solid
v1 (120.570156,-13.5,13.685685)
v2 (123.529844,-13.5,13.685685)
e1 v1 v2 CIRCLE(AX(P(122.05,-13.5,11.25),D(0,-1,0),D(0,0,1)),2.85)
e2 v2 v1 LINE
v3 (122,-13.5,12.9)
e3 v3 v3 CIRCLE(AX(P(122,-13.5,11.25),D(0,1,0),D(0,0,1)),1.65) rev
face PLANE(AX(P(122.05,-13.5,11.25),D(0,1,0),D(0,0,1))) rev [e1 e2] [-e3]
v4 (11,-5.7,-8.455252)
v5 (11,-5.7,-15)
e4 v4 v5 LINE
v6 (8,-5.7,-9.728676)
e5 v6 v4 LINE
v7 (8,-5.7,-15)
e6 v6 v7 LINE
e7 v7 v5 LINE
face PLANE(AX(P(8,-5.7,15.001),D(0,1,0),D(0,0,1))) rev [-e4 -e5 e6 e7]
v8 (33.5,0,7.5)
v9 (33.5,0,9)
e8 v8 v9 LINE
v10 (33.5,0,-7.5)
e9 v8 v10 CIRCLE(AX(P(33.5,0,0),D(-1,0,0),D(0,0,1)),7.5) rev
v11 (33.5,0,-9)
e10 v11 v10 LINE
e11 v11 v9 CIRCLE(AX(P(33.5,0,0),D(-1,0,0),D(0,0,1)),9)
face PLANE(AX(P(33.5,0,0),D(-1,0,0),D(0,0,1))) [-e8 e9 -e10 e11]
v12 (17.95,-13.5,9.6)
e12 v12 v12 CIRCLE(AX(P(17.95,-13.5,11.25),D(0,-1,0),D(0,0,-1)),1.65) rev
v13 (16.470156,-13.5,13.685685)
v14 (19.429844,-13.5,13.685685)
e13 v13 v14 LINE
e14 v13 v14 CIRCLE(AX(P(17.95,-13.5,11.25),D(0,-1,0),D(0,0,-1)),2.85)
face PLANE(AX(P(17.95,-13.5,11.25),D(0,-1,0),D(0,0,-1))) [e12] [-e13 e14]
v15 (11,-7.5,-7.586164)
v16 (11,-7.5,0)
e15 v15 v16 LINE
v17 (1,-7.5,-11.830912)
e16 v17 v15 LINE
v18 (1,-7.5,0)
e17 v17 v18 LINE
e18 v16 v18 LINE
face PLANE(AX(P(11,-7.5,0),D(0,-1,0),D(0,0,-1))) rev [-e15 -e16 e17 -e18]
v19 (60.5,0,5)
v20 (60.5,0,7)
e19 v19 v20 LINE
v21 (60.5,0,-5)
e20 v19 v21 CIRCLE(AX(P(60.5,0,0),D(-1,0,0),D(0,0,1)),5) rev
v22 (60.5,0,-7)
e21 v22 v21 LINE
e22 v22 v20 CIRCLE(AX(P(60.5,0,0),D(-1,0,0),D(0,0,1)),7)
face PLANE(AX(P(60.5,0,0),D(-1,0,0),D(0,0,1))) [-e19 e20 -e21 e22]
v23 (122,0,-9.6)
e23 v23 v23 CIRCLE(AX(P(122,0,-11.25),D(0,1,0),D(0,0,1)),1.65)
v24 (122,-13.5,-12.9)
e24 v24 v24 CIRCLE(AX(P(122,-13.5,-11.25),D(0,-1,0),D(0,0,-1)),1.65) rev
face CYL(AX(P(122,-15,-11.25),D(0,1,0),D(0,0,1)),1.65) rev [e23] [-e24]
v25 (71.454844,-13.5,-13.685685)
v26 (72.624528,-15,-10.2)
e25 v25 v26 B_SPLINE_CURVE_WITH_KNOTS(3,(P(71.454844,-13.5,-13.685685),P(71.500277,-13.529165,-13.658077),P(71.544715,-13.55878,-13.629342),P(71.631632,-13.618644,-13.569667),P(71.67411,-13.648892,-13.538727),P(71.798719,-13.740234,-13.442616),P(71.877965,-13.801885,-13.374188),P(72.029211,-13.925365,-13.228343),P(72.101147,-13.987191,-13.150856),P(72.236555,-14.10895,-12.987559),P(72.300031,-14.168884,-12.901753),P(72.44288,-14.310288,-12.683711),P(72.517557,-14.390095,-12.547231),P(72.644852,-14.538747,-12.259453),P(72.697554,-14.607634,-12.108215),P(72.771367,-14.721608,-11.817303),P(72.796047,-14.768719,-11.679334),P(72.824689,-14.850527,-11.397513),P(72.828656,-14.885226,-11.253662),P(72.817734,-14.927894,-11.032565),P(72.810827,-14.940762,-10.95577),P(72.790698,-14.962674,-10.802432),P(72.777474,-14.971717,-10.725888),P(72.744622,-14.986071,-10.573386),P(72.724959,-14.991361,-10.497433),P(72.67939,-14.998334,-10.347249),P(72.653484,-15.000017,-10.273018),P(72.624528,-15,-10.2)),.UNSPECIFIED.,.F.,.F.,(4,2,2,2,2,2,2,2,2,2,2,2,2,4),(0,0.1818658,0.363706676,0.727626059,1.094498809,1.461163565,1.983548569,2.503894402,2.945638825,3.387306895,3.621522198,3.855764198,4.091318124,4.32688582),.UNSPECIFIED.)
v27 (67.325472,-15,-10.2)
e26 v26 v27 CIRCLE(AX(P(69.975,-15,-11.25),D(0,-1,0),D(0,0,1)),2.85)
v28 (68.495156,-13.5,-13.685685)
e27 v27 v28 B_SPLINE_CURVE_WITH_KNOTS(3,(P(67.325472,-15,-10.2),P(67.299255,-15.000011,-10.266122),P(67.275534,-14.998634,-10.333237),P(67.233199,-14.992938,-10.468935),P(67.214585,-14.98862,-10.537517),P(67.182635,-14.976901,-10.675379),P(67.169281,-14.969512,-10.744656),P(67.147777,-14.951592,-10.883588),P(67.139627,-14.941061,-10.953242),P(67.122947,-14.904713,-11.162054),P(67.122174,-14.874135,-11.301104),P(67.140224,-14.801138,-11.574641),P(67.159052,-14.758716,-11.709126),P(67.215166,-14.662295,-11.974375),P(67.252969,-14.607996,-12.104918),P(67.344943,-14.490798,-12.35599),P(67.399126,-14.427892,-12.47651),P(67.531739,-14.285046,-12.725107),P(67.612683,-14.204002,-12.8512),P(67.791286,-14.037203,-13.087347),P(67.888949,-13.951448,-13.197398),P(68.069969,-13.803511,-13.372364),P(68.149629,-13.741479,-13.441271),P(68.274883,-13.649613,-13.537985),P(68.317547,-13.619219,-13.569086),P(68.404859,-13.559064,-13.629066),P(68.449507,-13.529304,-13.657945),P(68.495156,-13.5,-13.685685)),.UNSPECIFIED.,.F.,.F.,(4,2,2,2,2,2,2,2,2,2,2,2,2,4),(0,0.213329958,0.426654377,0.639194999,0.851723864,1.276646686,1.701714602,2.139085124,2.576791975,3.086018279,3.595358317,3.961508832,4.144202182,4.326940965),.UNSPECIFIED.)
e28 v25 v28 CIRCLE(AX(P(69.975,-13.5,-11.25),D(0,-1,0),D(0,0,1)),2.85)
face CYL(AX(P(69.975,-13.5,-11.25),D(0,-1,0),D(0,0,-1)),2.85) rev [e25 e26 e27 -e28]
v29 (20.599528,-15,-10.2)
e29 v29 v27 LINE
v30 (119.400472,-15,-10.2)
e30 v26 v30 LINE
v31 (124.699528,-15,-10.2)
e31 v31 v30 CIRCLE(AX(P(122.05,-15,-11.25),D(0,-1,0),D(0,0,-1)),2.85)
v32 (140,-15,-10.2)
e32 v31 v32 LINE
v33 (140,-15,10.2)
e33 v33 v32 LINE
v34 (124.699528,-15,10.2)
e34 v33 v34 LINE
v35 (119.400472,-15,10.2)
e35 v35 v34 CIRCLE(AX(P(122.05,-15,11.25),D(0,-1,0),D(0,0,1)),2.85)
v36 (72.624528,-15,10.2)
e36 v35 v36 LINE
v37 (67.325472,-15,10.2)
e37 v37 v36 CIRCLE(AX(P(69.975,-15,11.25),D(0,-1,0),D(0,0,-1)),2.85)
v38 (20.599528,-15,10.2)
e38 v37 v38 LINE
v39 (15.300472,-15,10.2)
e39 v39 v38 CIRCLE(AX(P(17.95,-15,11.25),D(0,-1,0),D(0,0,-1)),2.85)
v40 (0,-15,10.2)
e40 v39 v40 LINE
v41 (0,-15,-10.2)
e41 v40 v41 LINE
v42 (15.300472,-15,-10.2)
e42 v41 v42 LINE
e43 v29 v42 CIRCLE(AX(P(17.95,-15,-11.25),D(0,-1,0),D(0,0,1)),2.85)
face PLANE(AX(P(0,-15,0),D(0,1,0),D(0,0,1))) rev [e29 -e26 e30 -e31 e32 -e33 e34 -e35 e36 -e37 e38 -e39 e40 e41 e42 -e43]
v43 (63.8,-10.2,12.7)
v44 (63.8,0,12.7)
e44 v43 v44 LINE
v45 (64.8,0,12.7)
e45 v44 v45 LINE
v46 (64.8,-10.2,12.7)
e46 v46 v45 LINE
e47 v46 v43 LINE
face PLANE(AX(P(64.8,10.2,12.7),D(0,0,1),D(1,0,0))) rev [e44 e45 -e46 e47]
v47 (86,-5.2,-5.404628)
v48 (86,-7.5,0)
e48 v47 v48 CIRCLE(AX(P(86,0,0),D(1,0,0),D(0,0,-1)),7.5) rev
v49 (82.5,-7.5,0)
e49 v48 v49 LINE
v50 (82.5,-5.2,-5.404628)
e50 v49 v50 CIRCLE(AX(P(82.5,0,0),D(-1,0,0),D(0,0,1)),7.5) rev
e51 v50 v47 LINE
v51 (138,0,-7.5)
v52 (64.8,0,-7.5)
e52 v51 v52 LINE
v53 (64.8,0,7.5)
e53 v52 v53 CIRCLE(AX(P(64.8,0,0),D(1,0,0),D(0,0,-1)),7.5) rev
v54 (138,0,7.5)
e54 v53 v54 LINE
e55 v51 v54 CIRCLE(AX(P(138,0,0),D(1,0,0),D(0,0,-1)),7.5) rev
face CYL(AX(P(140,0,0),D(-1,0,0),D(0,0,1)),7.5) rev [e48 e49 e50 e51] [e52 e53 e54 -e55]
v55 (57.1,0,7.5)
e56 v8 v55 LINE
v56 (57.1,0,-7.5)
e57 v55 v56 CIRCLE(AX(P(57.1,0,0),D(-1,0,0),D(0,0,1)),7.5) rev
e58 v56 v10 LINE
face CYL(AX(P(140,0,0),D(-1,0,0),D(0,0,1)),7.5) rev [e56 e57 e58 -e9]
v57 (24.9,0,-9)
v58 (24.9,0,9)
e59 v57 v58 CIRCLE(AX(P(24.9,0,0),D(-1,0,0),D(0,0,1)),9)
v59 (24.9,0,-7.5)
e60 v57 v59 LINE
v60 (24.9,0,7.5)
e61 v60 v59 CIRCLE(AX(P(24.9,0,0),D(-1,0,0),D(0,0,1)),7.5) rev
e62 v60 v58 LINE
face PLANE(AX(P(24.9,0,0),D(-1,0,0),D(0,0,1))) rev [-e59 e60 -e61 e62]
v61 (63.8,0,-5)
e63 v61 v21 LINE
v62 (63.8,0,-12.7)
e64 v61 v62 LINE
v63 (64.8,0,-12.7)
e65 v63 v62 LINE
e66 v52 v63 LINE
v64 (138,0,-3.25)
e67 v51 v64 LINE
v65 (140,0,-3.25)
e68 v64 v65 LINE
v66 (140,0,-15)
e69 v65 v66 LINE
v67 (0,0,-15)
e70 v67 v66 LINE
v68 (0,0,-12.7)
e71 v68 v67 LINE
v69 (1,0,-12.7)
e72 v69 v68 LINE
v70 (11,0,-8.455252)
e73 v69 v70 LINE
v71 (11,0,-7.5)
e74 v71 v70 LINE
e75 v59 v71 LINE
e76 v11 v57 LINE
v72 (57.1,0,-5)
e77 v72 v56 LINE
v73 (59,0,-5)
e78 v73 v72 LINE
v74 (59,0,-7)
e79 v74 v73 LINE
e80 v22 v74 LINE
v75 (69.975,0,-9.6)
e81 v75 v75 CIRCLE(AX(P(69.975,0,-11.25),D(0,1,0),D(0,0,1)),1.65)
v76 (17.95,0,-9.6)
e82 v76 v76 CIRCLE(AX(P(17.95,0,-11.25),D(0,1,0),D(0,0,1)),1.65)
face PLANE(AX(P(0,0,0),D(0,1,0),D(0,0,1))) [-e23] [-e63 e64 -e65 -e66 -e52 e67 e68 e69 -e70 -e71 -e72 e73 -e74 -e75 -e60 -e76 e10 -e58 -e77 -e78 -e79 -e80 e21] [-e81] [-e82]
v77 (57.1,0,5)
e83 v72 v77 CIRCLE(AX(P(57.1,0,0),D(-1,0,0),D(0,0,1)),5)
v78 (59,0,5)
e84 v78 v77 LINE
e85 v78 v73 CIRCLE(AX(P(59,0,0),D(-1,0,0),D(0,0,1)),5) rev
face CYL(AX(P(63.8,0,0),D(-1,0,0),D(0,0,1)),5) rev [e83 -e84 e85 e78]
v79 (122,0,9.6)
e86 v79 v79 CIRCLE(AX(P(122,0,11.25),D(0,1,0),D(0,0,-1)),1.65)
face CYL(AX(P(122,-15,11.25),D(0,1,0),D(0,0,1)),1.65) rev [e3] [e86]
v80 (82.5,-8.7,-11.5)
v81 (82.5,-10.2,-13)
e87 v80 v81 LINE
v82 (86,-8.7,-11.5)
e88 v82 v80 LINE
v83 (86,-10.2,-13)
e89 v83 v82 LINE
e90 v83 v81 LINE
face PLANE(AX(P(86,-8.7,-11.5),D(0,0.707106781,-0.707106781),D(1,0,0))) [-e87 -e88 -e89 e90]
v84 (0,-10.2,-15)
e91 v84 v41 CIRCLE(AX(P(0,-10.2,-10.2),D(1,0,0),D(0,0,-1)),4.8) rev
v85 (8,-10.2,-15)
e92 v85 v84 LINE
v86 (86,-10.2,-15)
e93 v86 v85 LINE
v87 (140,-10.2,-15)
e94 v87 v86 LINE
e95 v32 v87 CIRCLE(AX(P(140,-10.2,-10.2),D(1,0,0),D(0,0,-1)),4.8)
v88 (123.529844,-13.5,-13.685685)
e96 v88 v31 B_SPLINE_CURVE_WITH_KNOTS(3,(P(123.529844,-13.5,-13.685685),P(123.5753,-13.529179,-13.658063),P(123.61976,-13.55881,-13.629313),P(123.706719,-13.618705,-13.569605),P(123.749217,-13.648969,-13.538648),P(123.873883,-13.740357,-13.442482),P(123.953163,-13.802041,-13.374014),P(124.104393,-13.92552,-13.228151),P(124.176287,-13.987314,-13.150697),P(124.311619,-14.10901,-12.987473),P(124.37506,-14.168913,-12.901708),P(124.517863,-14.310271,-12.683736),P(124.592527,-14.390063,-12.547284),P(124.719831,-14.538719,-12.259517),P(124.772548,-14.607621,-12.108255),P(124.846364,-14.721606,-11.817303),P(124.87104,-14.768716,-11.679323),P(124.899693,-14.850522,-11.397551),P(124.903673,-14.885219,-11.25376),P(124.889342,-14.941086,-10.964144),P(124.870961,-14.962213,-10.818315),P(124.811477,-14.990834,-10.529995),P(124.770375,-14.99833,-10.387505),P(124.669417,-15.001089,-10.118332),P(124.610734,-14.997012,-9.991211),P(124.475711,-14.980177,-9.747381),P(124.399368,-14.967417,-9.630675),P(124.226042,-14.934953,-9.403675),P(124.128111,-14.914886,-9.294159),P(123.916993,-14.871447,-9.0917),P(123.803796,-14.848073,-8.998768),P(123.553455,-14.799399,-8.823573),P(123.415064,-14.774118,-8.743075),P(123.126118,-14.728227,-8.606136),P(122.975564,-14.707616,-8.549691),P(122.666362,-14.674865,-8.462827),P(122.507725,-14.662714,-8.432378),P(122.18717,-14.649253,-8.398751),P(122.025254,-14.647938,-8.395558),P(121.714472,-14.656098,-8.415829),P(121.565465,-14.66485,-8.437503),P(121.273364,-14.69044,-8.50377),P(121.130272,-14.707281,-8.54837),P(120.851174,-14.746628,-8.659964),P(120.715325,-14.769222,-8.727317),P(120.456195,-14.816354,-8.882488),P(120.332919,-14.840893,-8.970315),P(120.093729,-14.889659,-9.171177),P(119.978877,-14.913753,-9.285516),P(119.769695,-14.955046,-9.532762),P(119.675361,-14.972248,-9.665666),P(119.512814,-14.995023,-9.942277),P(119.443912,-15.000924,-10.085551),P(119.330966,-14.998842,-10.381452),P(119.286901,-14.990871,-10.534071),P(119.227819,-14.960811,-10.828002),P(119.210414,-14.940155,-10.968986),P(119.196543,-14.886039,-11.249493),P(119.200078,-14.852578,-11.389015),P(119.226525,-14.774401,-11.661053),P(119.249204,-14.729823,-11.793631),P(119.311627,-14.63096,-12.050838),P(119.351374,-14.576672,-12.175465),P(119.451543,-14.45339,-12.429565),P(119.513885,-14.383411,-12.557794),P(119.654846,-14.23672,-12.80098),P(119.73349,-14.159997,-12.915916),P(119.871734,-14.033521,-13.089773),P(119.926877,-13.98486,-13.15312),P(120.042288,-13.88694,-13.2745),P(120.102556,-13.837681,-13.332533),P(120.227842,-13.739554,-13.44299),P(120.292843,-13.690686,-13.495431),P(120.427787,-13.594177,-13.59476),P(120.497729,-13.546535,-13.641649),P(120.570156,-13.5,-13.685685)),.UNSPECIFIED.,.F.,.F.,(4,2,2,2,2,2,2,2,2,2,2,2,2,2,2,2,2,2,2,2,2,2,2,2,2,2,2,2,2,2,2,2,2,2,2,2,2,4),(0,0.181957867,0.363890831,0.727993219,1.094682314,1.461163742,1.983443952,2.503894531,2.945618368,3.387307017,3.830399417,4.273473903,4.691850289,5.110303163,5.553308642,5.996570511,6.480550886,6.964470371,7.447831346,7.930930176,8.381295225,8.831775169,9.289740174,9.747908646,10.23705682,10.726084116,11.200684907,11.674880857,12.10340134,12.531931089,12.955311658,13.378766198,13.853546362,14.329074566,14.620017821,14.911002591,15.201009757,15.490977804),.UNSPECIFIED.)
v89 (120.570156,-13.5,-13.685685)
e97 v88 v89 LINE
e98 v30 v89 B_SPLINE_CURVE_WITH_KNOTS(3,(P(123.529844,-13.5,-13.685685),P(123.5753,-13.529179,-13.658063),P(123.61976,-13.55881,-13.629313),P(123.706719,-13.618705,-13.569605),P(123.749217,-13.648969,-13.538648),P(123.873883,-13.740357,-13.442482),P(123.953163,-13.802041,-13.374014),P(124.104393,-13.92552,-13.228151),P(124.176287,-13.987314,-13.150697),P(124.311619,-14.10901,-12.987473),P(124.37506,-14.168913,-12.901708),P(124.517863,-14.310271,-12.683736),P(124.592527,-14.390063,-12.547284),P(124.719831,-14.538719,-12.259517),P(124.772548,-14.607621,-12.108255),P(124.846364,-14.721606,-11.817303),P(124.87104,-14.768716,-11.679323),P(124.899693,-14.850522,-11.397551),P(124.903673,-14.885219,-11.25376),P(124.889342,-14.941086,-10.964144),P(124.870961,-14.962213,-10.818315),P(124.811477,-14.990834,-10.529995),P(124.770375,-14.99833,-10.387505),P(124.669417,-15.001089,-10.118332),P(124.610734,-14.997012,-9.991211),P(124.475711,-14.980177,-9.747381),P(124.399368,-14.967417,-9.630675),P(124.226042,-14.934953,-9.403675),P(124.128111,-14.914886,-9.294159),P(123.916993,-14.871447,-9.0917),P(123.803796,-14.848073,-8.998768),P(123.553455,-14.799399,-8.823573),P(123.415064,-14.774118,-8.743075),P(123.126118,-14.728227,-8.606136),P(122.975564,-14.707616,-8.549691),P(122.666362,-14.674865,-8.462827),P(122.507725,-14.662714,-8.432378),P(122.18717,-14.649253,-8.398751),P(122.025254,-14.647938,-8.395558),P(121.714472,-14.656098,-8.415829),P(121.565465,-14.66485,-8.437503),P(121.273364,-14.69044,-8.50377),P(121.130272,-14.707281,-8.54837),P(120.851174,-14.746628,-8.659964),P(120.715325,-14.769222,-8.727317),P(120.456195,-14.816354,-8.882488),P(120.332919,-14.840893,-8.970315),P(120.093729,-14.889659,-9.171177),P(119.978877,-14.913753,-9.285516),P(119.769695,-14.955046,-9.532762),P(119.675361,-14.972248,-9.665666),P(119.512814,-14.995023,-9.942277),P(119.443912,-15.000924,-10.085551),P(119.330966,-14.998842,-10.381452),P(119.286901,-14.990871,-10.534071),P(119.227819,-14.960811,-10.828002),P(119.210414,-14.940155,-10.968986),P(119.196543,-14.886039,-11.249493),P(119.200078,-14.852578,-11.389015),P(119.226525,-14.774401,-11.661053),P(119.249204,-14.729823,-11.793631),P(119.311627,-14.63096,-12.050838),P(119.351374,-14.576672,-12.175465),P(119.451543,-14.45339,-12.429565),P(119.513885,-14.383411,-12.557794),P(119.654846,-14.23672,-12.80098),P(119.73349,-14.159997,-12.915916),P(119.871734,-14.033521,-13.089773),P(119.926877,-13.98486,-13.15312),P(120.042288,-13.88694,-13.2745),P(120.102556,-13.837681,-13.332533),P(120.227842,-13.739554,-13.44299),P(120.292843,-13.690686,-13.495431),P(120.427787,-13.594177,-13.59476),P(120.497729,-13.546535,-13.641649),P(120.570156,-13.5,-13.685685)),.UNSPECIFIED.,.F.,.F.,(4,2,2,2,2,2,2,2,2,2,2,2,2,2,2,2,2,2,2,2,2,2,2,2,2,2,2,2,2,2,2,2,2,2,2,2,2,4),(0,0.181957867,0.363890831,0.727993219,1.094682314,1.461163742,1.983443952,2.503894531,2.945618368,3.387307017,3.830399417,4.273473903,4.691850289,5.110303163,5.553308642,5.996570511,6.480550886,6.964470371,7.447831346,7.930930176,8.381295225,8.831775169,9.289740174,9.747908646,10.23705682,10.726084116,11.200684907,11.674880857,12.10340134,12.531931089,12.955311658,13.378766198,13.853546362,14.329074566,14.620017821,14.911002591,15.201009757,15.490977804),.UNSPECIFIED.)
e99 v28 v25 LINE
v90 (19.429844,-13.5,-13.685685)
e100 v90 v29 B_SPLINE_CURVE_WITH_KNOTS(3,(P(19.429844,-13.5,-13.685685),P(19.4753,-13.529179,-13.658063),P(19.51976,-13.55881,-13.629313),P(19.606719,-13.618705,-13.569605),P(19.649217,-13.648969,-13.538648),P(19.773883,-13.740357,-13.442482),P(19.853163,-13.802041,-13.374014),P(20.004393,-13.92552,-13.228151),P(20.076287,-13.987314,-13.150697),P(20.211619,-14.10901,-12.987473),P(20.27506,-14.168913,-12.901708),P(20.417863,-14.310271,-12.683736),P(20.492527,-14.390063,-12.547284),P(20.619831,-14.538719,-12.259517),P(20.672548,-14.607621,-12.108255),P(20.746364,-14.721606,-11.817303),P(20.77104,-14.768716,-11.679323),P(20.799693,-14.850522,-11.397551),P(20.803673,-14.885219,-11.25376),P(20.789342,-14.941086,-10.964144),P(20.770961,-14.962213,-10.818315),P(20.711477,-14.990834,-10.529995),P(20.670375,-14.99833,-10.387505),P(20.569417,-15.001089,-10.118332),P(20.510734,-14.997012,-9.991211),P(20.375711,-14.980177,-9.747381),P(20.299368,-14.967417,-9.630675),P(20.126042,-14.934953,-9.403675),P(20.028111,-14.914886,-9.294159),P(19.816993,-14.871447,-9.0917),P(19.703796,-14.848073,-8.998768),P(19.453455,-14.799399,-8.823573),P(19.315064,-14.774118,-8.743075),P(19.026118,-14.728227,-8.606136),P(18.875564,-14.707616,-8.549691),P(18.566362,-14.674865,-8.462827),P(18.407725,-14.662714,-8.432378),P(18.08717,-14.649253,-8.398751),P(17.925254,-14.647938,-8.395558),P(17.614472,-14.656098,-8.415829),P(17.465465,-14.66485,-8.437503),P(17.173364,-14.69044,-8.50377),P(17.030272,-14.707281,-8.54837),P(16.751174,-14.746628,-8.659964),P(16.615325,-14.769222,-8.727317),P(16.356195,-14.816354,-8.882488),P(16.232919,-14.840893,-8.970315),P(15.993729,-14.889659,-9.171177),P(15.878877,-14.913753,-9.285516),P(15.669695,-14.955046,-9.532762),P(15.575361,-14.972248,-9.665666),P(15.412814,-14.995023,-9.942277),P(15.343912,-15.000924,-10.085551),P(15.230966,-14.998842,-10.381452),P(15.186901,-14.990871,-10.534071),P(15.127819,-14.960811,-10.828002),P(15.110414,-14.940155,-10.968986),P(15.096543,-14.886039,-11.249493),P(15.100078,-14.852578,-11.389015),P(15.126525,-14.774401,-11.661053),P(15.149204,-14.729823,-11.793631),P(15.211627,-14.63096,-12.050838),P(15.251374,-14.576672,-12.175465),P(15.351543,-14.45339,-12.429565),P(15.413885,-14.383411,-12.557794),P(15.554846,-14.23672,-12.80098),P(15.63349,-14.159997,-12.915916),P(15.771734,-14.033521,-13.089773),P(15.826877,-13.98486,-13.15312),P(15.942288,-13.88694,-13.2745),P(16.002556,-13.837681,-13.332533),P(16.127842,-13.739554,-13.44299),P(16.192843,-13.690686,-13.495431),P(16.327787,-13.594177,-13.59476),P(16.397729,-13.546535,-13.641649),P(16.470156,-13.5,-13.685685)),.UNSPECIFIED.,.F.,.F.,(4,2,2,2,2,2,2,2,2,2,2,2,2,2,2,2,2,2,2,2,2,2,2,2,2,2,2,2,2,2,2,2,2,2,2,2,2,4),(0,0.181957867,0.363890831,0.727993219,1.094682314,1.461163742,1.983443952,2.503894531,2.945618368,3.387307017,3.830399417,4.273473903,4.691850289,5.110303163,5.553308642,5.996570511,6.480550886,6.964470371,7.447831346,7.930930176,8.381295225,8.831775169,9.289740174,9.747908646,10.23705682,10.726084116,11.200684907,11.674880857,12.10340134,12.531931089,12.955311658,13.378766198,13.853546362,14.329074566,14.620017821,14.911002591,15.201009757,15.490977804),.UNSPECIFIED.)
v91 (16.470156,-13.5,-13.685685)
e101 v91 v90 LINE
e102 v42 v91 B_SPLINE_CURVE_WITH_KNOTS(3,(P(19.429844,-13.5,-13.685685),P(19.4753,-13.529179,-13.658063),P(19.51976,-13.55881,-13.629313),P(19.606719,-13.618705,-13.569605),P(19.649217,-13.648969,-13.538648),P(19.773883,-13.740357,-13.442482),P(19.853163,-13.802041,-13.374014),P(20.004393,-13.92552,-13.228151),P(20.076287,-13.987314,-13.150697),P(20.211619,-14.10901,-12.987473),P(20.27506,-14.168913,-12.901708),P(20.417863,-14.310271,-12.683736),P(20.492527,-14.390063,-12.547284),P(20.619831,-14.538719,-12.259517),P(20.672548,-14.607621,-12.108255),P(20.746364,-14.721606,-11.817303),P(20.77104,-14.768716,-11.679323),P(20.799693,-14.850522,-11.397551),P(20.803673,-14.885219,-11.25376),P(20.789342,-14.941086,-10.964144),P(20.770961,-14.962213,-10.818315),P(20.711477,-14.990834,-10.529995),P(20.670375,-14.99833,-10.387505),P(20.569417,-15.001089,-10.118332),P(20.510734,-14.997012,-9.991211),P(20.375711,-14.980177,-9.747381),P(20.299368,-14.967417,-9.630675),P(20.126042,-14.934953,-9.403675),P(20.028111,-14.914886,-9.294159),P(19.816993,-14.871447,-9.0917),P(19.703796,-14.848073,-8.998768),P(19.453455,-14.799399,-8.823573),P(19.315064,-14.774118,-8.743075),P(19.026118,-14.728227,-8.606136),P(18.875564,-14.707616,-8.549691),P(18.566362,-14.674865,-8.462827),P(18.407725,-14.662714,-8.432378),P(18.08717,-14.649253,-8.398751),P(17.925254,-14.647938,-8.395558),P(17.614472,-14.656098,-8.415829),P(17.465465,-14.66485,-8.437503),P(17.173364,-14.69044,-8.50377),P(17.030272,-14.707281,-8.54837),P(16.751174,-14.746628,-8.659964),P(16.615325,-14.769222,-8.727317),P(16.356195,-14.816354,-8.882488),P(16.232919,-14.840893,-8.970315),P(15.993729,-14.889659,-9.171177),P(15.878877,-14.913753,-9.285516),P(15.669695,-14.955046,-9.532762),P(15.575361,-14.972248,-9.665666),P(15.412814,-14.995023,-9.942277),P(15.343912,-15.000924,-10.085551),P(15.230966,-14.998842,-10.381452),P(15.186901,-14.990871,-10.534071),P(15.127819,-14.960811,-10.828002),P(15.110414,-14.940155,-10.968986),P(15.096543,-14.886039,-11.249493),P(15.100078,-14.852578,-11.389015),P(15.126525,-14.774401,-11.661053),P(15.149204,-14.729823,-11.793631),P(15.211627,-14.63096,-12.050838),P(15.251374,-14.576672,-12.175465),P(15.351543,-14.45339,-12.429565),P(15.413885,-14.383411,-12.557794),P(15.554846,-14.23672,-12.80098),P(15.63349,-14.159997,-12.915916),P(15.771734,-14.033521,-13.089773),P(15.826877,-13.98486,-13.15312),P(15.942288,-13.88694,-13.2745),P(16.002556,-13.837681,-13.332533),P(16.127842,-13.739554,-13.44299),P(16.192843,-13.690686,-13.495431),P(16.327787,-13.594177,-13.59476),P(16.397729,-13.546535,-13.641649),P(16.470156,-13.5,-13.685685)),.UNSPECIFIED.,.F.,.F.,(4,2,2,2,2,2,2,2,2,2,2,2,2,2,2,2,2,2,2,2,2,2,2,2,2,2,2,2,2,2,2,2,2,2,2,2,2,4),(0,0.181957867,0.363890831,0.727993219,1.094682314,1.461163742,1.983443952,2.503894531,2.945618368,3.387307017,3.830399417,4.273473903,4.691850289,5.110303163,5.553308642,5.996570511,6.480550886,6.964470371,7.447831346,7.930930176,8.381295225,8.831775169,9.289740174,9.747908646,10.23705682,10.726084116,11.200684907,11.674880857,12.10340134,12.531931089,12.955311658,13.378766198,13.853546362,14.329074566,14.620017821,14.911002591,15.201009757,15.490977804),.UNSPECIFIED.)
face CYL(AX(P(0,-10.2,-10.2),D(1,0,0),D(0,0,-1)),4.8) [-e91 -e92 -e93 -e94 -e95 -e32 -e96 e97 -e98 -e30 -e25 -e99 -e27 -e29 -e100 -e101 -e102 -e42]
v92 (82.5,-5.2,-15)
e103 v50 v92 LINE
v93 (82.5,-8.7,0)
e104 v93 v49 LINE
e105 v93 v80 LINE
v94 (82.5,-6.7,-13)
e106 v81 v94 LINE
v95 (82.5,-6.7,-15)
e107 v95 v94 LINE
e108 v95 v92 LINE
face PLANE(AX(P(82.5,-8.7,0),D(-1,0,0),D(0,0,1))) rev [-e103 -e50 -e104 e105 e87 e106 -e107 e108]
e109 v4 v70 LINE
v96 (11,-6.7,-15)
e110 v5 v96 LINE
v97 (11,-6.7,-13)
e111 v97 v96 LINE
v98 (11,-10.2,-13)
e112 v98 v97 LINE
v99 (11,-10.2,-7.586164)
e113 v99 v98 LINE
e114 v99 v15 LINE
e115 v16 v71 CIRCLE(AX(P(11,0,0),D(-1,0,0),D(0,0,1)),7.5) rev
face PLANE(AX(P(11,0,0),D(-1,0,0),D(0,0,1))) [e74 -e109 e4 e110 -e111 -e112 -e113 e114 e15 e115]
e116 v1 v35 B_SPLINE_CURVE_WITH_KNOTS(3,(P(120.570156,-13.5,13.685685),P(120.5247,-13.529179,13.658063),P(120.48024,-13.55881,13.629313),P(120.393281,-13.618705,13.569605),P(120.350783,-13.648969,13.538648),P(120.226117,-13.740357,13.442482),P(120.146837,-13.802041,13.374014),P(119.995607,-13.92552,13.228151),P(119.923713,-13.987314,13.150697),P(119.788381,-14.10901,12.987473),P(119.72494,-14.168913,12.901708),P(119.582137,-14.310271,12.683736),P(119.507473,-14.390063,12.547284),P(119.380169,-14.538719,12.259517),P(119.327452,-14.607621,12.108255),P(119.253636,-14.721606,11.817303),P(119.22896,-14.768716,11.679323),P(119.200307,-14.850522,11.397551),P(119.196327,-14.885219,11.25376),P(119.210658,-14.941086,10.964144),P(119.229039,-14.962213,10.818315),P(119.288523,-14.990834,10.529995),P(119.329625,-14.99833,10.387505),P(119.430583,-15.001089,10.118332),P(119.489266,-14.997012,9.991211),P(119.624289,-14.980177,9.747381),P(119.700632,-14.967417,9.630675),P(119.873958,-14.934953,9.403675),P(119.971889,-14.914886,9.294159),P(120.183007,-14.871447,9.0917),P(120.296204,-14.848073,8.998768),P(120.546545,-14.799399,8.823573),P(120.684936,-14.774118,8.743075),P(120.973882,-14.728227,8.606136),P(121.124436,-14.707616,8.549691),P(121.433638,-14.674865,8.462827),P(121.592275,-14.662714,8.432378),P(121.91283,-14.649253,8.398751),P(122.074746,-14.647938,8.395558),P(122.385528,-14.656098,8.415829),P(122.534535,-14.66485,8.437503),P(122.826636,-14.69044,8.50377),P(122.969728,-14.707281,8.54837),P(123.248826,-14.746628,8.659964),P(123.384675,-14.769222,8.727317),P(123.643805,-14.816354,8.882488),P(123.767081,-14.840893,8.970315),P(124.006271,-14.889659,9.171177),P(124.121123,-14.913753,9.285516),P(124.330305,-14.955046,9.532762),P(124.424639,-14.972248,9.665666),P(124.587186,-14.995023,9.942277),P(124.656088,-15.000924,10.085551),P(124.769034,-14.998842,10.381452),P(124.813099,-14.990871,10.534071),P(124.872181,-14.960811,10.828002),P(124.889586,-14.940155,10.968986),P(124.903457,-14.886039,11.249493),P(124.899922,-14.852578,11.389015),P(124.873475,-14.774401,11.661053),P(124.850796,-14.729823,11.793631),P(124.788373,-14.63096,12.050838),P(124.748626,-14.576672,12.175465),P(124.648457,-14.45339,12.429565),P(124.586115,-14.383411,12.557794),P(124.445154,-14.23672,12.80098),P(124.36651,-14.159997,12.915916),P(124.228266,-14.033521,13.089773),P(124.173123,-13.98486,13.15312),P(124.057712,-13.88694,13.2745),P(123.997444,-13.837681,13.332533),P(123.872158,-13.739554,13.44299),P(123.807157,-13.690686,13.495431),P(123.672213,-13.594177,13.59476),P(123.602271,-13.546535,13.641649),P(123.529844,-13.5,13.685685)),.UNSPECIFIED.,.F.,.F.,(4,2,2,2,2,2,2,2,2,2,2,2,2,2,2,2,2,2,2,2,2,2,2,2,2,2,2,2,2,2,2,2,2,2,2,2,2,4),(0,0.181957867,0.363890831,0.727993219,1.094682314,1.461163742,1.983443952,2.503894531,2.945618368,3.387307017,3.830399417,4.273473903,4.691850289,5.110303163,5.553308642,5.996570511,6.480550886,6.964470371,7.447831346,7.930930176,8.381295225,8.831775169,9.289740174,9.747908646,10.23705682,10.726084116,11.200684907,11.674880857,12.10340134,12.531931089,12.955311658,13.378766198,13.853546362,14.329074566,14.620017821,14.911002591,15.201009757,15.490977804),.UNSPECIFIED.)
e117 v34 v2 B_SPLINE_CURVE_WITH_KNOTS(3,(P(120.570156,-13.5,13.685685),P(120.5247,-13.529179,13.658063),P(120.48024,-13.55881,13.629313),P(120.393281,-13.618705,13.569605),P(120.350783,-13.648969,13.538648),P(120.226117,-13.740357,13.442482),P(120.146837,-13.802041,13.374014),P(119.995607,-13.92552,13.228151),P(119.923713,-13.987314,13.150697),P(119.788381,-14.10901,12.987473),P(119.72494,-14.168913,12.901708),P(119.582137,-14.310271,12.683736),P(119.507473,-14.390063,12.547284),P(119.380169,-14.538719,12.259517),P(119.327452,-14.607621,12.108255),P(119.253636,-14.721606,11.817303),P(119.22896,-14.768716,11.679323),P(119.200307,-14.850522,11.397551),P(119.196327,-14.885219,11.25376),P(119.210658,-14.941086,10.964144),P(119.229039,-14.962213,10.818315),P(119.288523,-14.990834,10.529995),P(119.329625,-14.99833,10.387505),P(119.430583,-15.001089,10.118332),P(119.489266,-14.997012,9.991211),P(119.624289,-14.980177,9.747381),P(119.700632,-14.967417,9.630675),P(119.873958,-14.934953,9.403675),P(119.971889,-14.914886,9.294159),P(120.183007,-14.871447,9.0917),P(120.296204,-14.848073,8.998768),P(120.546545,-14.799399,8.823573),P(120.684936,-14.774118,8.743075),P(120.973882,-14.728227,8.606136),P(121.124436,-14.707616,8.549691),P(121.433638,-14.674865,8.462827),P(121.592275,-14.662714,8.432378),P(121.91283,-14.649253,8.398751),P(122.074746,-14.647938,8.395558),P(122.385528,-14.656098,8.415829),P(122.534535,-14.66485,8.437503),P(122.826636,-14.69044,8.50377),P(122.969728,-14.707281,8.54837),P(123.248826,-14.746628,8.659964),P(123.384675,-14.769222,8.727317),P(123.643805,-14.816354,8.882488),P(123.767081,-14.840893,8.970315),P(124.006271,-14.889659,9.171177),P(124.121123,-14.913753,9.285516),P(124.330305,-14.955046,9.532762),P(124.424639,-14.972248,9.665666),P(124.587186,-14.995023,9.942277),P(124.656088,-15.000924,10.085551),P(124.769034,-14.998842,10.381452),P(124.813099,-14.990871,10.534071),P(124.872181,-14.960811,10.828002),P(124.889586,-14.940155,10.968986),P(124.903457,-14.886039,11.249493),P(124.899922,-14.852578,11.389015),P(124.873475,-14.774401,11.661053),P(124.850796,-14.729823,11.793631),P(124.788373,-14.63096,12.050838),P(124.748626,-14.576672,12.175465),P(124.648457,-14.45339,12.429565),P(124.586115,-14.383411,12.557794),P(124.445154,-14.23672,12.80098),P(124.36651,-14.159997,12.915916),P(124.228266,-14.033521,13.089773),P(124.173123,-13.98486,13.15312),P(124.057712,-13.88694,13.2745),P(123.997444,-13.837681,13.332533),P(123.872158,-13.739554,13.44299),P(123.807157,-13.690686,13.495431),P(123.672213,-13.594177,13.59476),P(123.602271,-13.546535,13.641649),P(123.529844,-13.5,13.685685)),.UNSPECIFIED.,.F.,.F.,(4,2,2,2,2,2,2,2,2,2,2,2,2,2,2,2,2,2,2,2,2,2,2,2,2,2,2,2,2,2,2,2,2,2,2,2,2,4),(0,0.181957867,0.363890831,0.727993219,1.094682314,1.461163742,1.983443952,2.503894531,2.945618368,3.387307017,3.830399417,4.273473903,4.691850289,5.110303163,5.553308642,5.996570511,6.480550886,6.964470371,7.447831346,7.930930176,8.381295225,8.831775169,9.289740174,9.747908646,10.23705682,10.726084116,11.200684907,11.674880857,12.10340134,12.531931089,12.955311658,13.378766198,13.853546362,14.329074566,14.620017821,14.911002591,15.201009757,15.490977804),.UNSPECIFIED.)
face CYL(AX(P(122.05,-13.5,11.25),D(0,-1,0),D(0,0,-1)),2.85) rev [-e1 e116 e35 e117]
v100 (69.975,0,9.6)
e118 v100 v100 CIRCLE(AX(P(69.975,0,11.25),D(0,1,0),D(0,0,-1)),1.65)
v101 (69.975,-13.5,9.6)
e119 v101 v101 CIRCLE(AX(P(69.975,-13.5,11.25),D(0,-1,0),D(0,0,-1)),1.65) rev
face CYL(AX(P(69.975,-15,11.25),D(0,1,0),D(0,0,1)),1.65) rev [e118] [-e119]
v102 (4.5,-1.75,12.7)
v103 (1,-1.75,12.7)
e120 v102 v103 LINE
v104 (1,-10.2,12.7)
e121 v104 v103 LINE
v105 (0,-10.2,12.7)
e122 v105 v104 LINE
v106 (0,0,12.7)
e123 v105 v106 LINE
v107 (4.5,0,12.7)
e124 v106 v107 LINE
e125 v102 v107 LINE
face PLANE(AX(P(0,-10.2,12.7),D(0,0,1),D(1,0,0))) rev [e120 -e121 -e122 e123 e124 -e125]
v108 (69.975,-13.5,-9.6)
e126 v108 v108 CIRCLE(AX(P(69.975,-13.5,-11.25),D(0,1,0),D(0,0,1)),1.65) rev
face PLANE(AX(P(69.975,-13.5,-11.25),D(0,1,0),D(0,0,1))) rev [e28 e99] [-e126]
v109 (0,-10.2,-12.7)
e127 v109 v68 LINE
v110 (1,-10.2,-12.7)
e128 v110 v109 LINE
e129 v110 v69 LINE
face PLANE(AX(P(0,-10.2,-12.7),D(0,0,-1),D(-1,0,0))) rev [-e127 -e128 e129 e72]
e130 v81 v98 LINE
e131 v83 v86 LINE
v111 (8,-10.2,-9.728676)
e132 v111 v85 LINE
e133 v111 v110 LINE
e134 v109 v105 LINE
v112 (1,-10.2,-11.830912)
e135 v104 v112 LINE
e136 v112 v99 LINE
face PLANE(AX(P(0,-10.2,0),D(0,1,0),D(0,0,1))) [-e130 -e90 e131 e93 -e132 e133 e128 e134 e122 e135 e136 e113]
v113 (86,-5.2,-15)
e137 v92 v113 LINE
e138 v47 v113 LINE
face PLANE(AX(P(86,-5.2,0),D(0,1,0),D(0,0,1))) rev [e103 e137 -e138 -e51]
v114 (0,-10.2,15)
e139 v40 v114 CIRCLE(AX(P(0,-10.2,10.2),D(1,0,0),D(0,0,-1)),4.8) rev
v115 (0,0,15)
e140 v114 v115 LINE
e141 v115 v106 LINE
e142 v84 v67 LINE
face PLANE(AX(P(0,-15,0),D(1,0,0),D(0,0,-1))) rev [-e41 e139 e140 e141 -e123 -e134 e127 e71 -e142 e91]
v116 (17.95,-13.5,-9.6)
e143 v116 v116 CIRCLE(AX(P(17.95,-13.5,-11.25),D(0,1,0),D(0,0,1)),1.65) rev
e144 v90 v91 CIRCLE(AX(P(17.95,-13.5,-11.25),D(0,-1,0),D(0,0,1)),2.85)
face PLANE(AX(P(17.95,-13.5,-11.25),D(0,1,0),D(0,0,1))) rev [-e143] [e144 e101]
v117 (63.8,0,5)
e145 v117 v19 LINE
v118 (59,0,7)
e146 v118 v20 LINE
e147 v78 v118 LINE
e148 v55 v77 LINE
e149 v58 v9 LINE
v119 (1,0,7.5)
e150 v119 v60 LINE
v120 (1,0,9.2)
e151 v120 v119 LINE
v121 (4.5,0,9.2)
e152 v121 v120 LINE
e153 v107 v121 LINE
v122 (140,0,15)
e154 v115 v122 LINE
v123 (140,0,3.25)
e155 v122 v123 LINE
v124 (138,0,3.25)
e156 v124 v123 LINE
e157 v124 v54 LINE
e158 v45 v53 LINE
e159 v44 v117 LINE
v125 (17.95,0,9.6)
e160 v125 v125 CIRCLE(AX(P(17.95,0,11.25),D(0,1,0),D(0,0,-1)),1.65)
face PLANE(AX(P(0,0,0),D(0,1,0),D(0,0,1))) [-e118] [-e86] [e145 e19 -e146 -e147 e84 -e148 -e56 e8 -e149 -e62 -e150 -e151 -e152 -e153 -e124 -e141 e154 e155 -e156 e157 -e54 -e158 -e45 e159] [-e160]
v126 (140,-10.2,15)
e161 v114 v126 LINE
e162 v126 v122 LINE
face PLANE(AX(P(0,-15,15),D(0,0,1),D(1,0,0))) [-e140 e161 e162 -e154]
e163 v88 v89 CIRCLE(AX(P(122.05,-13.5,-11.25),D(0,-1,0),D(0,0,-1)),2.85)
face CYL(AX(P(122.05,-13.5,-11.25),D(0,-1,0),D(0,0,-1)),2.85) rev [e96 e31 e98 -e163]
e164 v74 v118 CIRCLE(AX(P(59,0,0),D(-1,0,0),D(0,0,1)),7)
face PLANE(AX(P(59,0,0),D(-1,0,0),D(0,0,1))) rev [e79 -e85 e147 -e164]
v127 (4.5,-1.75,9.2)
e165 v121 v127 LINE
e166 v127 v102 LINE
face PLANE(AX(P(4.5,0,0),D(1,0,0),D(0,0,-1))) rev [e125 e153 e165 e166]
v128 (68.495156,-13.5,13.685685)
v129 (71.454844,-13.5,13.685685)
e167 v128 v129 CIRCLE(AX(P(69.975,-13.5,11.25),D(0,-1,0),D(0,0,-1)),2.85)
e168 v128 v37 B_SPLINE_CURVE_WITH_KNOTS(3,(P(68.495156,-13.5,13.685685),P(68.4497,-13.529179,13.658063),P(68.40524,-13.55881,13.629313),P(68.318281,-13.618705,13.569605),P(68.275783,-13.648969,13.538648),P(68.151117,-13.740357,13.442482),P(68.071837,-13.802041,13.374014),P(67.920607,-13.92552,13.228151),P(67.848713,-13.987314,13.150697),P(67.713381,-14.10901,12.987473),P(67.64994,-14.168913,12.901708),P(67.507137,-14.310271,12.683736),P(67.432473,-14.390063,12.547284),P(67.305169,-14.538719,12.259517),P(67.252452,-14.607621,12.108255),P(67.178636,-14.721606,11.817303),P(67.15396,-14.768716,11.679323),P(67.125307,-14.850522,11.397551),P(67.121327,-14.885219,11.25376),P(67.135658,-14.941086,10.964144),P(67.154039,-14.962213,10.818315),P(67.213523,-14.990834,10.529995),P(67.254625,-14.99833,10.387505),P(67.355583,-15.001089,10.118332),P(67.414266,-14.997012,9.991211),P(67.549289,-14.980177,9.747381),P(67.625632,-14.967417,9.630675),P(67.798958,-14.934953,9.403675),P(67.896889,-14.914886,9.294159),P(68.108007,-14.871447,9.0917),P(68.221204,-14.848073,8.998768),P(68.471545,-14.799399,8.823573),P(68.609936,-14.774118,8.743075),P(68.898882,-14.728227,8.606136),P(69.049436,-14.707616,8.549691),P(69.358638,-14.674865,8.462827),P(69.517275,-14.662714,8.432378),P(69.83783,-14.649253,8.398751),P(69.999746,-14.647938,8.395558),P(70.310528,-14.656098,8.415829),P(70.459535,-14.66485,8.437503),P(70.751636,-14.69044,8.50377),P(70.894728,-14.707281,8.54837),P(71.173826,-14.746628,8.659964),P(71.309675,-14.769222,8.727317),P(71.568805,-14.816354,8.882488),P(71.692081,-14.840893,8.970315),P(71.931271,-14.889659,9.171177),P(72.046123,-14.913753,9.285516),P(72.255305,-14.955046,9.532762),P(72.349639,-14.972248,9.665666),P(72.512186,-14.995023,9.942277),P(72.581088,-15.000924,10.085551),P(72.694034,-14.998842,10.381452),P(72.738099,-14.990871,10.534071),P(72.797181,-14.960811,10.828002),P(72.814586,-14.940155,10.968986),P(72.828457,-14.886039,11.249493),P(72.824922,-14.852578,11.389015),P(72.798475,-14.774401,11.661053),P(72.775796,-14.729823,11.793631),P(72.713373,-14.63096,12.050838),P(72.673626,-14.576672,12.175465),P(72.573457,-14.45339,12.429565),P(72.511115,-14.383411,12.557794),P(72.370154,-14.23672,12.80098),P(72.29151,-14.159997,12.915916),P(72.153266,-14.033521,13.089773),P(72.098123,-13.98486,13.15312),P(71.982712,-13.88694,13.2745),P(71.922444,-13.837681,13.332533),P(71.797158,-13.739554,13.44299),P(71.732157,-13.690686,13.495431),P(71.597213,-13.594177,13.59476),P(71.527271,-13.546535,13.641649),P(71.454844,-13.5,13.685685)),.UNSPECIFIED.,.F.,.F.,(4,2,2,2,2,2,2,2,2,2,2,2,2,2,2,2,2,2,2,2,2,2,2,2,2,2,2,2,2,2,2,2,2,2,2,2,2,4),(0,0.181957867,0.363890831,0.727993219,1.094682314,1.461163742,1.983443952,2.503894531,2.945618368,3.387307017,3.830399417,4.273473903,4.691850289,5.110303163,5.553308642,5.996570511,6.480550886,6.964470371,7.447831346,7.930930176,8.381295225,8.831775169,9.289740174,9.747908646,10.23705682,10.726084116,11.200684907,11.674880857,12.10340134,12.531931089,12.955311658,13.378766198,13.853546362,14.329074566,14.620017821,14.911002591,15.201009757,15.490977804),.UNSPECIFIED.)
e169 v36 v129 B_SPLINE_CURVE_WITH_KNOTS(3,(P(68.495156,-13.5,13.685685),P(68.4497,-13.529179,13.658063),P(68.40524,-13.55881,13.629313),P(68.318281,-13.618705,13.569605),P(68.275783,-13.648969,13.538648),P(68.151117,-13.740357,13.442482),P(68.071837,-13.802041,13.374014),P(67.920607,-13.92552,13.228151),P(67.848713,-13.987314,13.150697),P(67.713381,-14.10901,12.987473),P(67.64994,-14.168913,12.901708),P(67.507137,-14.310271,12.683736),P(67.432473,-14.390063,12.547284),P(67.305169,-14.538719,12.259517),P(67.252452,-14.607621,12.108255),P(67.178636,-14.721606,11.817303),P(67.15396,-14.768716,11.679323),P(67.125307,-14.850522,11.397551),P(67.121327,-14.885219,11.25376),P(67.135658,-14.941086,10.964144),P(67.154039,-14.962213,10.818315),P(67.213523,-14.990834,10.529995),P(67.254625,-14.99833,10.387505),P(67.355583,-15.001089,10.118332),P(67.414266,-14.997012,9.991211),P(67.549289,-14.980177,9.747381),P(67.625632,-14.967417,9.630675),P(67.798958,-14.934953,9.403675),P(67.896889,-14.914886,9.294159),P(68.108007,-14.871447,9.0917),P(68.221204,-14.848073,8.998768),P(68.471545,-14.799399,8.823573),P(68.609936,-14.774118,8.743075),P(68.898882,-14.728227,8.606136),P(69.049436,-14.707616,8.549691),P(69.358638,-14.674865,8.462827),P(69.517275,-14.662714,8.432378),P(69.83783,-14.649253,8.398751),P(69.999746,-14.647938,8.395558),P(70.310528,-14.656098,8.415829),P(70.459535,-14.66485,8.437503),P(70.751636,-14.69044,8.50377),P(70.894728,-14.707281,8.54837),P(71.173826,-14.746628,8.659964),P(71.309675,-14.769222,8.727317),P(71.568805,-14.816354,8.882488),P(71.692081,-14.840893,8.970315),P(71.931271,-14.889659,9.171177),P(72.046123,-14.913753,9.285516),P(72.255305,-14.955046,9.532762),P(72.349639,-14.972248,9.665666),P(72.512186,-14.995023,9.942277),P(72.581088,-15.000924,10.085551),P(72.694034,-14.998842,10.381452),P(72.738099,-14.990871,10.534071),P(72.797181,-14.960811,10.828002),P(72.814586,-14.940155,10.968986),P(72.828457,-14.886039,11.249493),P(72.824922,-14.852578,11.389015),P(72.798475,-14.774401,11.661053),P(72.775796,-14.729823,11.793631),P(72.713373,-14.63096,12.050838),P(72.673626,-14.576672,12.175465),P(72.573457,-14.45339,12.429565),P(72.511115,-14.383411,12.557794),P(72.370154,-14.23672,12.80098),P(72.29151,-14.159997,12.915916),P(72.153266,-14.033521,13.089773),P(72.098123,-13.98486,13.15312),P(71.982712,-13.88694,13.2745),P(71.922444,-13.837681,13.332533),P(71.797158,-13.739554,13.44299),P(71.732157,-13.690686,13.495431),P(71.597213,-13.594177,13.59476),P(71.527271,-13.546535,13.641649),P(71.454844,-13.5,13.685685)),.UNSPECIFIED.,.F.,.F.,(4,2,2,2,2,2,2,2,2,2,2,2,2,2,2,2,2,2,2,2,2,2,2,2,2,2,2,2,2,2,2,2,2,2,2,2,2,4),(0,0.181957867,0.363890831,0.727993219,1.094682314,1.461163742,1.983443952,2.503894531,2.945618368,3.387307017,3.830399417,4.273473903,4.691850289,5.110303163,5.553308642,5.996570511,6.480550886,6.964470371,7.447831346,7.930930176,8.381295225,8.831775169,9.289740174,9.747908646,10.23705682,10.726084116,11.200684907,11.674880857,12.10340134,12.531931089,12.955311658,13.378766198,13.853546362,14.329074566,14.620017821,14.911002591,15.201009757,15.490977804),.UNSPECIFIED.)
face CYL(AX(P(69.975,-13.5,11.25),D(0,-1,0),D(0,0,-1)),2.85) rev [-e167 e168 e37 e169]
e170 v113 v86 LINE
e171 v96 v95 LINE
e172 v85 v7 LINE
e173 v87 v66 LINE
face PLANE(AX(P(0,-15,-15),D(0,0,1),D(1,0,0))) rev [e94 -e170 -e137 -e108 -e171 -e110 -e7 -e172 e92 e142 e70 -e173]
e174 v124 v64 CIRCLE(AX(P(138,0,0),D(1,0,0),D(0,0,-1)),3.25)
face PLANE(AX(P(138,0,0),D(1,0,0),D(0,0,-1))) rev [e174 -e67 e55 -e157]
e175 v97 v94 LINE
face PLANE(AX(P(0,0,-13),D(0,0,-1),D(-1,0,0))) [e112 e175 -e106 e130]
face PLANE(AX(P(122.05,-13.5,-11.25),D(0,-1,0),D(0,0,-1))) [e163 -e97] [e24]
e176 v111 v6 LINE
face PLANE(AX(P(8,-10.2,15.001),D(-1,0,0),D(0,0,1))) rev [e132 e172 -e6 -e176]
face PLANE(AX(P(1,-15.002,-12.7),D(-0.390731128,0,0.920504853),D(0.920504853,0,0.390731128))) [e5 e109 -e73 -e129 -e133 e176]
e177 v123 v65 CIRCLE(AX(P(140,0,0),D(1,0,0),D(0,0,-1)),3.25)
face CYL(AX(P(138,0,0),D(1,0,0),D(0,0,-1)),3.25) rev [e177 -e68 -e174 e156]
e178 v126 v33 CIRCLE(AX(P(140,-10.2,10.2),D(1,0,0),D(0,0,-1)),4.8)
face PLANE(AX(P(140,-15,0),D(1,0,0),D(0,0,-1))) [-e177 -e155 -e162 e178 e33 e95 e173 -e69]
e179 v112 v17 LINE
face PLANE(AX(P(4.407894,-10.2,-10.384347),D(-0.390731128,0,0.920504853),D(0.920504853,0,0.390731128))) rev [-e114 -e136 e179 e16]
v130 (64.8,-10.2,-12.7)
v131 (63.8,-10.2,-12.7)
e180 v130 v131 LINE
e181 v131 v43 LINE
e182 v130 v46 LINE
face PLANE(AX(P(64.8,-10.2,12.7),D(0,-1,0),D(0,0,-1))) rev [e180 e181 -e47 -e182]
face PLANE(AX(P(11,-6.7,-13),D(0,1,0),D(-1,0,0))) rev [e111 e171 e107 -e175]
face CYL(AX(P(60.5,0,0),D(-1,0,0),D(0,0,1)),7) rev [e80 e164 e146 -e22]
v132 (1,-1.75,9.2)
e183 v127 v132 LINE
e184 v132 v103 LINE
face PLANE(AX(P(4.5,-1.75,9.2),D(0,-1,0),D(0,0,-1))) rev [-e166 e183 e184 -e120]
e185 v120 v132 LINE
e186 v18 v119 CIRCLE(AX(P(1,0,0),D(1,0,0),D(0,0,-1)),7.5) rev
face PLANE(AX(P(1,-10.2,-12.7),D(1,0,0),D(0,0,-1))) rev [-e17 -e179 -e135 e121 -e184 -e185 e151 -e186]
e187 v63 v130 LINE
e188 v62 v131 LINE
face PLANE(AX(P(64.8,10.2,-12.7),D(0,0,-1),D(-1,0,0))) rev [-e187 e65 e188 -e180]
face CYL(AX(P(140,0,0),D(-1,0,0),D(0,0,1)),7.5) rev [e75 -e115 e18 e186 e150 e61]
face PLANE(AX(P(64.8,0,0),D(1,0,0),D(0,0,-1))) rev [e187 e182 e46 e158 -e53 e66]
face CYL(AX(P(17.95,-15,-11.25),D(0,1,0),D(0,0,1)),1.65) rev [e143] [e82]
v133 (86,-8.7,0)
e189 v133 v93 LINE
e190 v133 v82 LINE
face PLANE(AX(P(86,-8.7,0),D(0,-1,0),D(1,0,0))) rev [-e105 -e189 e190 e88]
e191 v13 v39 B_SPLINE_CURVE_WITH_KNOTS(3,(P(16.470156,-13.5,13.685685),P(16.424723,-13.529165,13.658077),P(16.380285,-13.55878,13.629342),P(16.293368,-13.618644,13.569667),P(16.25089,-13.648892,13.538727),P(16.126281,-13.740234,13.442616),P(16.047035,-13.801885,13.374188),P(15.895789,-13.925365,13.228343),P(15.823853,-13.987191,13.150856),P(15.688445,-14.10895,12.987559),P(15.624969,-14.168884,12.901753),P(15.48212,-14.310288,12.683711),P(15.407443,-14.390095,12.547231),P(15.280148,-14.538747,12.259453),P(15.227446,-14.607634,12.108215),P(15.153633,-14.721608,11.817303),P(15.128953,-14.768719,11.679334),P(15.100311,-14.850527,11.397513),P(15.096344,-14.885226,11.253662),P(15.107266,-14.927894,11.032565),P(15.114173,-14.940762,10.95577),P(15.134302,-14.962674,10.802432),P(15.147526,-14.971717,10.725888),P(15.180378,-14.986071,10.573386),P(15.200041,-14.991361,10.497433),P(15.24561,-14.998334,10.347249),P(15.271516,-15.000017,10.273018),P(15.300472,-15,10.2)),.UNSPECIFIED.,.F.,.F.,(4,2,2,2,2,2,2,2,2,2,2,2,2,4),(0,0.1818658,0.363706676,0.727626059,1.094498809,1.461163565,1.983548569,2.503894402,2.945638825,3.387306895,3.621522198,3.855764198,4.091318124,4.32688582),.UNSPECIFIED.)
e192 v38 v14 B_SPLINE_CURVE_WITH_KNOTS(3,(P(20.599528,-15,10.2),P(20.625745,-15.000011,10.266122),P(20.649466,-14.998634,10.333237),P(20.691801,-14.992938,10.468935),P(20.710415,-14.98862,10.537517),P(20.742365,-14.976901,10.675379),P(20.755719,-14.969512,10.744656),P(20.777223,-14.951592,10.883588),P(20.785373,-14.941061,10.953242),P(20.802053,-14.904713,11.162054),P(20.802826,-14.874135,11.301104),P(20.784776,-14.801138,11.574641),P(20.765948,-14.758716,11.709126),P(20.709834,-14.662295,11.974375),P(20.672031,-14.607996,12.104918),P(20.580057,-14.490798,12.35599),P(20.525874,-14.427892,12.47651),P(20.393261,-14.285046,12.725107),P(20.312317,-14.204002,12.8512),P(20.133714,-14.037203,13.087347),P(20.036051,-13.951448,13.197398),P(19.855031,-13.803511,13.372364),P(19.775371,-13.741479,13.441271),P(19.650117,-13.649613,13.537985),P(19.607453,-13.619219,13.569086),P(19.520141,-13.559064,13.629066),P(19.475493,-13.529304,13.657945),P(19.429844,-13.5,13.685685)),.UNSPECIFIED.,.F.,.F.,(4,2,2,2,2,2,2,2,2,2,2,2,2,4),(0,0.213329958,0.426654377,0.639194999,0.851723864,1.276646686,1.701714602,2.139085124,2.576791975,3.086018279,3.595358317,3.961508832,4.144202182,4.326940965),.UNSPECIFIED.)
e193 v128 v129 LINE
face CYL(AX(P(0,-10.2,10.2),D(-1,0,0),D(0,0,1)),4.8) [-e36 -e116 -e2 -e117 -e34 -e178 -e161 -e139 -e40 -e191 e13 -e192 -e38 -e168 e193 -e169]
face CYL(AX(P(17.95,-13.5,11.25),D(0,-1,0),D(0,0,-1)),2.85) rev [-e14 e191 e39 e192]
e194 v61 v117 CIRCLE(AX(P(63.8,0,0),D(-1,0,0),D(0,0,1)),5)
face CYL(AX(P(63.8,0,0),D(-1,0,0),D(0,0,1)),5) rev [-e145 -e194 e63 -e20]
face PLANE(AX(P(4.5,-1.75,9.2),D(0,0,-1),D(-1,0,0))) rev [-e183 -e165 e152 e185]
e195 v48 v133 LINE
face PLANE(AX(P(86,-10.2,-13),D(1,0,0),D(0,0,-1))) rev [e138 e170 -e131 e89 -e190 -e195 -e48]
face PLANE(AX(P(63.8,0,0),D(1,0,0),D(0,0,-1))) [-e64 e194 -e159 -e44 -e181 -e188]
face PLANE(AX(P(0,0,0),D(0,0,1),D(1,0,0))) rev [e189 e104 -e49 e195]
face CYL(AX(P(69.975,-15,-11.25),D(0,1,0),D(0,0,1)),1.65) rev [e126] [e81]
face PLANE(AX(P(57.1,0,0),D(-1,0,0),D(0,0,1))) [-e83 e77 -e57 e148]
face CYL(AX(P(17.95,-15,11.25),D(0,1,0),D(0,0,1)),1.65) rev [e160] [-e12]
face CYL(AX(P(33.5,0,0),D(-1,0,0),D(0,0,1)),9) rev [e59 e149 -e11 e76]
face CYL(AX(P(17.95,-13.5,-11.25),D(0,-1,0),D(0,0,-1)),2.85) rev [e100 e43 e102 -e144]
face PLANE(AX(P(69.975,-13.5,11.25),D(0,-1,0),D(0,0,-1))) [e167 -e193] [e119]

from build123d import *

# Parameters (mm, degrees)
SKETCH2_W                 = 140
SKETCH2_H                 = 15
BASE_DEPTH                = 15
SKETCH3_R                 = 7.5
CENTER_CUT_DEPTH          = 142.598022585
SKETCH4_W                 = 1
SKETCH4_H                 = 25.4
ANTENNA_PCB_DEPTH         = 10.2
SKETCH14_W                = 3.5
SKETCH14_H                = 3.5
COAXIAL_CONNECTOR_DEPTH   = 3.5
LENS_START                = -23.9
SKETCH8_R                 = 9
LENS_DEPTH                = 8.6
PHOTODIODE_PCB_START      = -62.8
SKETCH10_W                = 25.4
SKETCH10_H                = 20.4
PHOTODIODE_PCB_DEPTH      = 1
FILLET1_R                 = 4.8
COAX_CONNECTOR_HOLE_START = -2
COAX_CONNECTOR_HOLE_DEPTH = 2
SKETCH16_W                = 12.7
SKETCH16_H                = 7.5
CUT_EXTRUDE2_DEPTH        = 10
BOSS_EXTRUDE1_REACH       = 143.598
CUT_EXTRUDE3_DEPTH        = 2.7
SKETCH19_R                = 1.65
CUT_EXTRUDE4_DEPTH        = 15
SKETCH20_R                = 2.85
CUT_EXTRUDE5_DEPTH        = 1.5
CUT_EXTRUDE6_REACH        = 145.962
SKETCH21_W                = 3
SKETCH21_H                = 4.5
SKETCH22_W                = 75
SKETCH22_H                = 3.5
CUT_EXTRUDE7_DEPTH        = 2
SKETCH24_W                = 3.5
SKETCH24_H                = 3.5
CUT_EXTRUDE8_DEPTH        = 15
CHAMFER2_SIZE             = 1.5
FILTER_MOUNT_START        = -56.1
FILTER_MOUNT_DEPTH        = 6.7
FILTER_SPACE_START        = -58
SKETCH9_R                 = 7
FILTER_SPACE_DEPTH        = 1.5


with BuildPart() as part:
    # Sketch2 → Base (new body)
    with BuildSketch(Plane(origin=(0, 0, 0), x_dir=(1, 0, 0), z_dir=(0, 1, 0))):
        with Locations((70, -7.5)):
            Rectangle(SKETCH2_W, SKETCH2_H)
        with Locations((70, 7.5)):
            Rectangle(SKETCH2_W, SKETCH2_H)
    extrude(amount=-BASE_DEPTH)

    # Sketch3 → Center_cut (cut, through all)
    with BuildSketch(Plane.ZY):
        Circle(SKETCH3_R)
    extrude(amount=-CENTER_CUT_DEPTH, mode=Mode.SUBTRACT)

    # Sketch4 → Antenna_PCB (cut)
    with BuildSketch(Plane(origin=(0, 0, 0), x_dir=(1, 0, 0), z_dir=(0, 1, 0))):
        with Locations((0.5, 0)):
            Rectangle(SKETCH4_W, SKETCH4_H)
    extrude(amount=-ANTENNA_PCB_DEPTH, mode=Mode.SUBTRACT)

    # Sketch14 → Coaxial_connector (cut)
    with BuildSketch(Plane.ZY.offset(-1)):
        with Locations((10.95, 0)):
            Rectangle(SKETCH14_W, SKETCH14_H)
    extrude(amount=-COAXIAL_CONNECTOR_DEPTH, mode=Mode.SUBTRACT)

    # Sketch8 → Lens (cut)
    with BuildSketch(Plane.ZY.offset(-1).offset(LENS_START)):
        Circle(SKETCH8_R)
    extrude(amount=-LENS_DEPTH, mode=Mode.SUBTRACT)

    # Sketch10 → Photodiode_PCB (cut)
    with BuildSketch(Plane.ZY.offset(-1).offset(PHOTODIODE_PCB_START)):
        Rectangle(SKETCH10_W, SKETCH10_H)
    extrude(amount=-PHOTODIODE_PCB_DEPTH, mode=Mode.SUBTRACT)

    # Fillet1
    fillet1_edges = [part.edges().sort_by_distance(p)[0] for p in [
        (70, -15, -15),
        (70, -15, 15),
    ]]
    fillet(fillet1_edges, radius=FILLET1_R)

    # Sketch15 → Coax_connector_hole (add)
    with BuildSketch(Plane(origin=(140, 0, 0), x_dir=(0, 0, -1), z_dir=(1, 0, 0)).offset(COAX_CONNECTOR_HOLE_START)):
        with BuildLine():
            ThreePointArc((-7.5, 0), (0, -7.5), (7.5, 0))
            Line((7.5, 0), (3.25, 0))
            ThreePointArc((3.25, 0), (0, -3.25), (-3.25, 0))
            Line((-3.25, 0), (-7.5, 0))
        make_face()
        with BuildLine():
            Line((11.25, -8), (11.25, 0))
            Line((11.25, 0), (7.5, 0))
            ThreePointArc((7.5, 0), (0, -7.5), (-7.5, 0))
            Line((-7.5, 0), (-11.25, 0))
            Line((-11.25, 0), (-11.25, -8))
            Line((-11.25, -8), (11.25, -8))
        make_face()
    extrude(amount=COAX_CONNECTOR_HOLE_DEPTH)

    # Sketch16 → Cut-Extrude2 (cut)
    with BuildSketch(Plane.ZY.offset(-1)):
        with Locations((-6.35, -3.75)):
            Rectangle(SKETCH16_W, SKETCH16_H)
    extrude(amount=-CUT_EXTRUDE2_DEPTH, mode=Mode.SUBTRACT)

    # Sketch17 → Boss-Extrude1 (add, up to next)
    with BuildSketch(Plane(origin=(0, 0, 0), x_dir=(1, 0, 0), z_dir=(0, 1, 0)), mode=Mode.PRIVATE) as boss_extrude1_sk1:
        Polygon((1, 12.7), (11, 8.455251838), (11, 12.7), align=None)
    boss_extrude1_tool1 = extrude(boss_extrude1_sk1.sketch, amount=-BOSS_EXTRUDE1_REACH, mode=Mode.PRIVATE) - part.part
    add(boss_extrude1_tool1.solids().sort_by_distance((7.666667, 0, -11.285084))[0])

    # Sketch18 → Cut-Extrude3 (cut)
    with BuildSketch(Plane(origin=(0, -7.5, 0), x_dir=(1, 0, 0), z_dir=(0, 1, 0))):
        Polygon((11, 8.455251838), (1, 12.7), (1, 11.830911698), (11, 7.586163536), align=None)
    extrude(amount=-CUT_EXTRUDE3_DEPTH, mode=Mode.SUBTRACT)

    # Sketch19 → Cut-Extrude4 (cut)
    with BuildSketch(Plane(origin=(0, 0, 0), x_dir=(1, 0, 0), z_dir=(0, 1, 0))):
        with Locations(Location((17.95, 11.25, 0), (0, 0, 270))):
            Circle(SKETCH19_R)
        with Locations(Location((122, 11.25, 0), (0, 0, 270))):
            Circle(SKETCH19_R)
        with Locations(Location((122, -11.25, 0), (0, 0, 39.521196359))):
            Circle(SKETCH19_R)
        with Locations(Location((17.95, -11.25, 0), (0, 0, 140.478803641))):
            Circle(SKETCH19_R)
        with Locations(Location((69.975, 11.25, 0), (0, 0, 270))):
            Circle(SKETCH19_R)
        with Locations(Location((69.975, -11.25, 0), (0, 0, 39.521196359))):
            Circle(SKETCH19_R)
    extrude(amount=-CUT_EXTRUDE4_DEPTH, mode=Mode.SUBTRACT)

    # Sketch20 → Cut-Extrude5 (cut)
    with BuildSketch(Plane.XZ.offset(15)):
        with Locations((17.95, 11.25)):
            Circle(SKETCH20_R)
        with Locations((122.05, 11.25)):
            Circle(SKETCH20_R)
        with Locations((122.05, -11.25)):
            Circle(SKETCH20_R)
        with Locations((17.95, -11.25)):
            Circle(SKETCH20_R)
        with Locations((69.975, 11.25)):
            Circle(SKETCH20_R)
        with Locations((69.975, -11.25)):
            Circle(SKETCH20_R)
    extrude(amount=-CUT_EXTRUDE5_DEPTH, mode=Mode.SUBTRACT)

    # Cut-Extrude6: up to this plane
    cut_extrude6_end = Plane(origin=(1, -15.002, -12.7), z_dir=(-0.3907311284892679, 0, 0.9205048534524428))
    # Sketch21 → Cut-Extrude6 (cut, up to the surface)
    with BuildSketch(Plane(origin=(0, 0, -15), x_dir=(-1, 0, 0), z_dir=(0, 0, -1)), mode=Mode.PRIVATE) as cut_extrude6_sk1:
        with Locations((-9.5, -7.95)):
            Rectangle(SKETCH21_W, SKETCH21_H)
    cut_extrude6_tool1 = split(extrude(cut_extrude6_sk1.sketch, amount=-CUT_EXTRUDE6_REACH, mode=Mode.PRIVATE), bisect_by=cut_extrude6_end, keep=Keep.BOTH, mode=Mode.PRIVATE)
    add(cut_extrude6_tool1.solids().sort_by_distance((9.5, -7.95, -15))[0], mode=Mode.SUBTRACT)

    # Sketch22 → Cut-Extrude7 (cut)
    with BuildSketch(Plane(origin=(0, 0, -15), x_dir=(-1, 0, 0), z_dir=(0, 0, -1))):
        with Locations((-48.5, -8.45)):
            Rectangle(SKETCH22_W, SKETCH22_H)
    extrude(amount=-CUT_EXTRUDE7_DEPTH, mode=Mode.SUBTRACT)

    # Sketch24 → Cut-Extrude8 (cut)
    with BuildSketch(Plane(origin=(0, 0, -15), x_dir=(-1, 0, 0), z_dir=(0, 0, -1))):
        with Locations((-84.25, -6.95)):
            Rectangle(SKETCH24_W, SKETCH24_H)
    extrude(amount=-CUT_EXTRUDE8_DEPTH, mode=Mode.SUBTRACT)

    # Chamfer2
    chamfer2_edges = [part.edges().sort_by_distance(p)[0] for p in [
        (84.25, -8.7, -13),
    ]]
    chamfer(chamfer2_edges, length=CHAMFER2_SIZE - 0.0001)  # a hair under: the kernel refuses the full size

    # Sketch25 → Filter_mount (add)
    with BuildSketch(Plane.ZY.offset(-1).offset(FILTER_MOUNT_START)):
        with BuildLine():
            ThreePointArc((0, -7.5), (5.303300859, -5.303300859), (7.5, 0))
            Line((7.5, 0), (5, 0))
            ThreePointArc((5, 0), (0, -5), (-5, 0))
            Line((-5, 0), (-7.5, 0))
            Line((-7.5, 0), (-7.5, -7.5))
            Line((-7.5, -7.5), (0, -7.5))
        make_face()
        with BuildLine():
            Line((7.5, -7.5), (7.5, 0))
            ThreePointArc((7.5, 0), (5.303300859, -5.303300859), (0, -7.5))
            Line((0, -7.5), (7.5, -7.5))
        make_face()
    extrude(amount=-FILTER_MOUNT_DEPTH)

    # Sketch9 → Filter_space (cut)
    with BuildSketch(Plane.ZY.offset(-1).offset(FILTER_SPACE_START)):
        Circle(SKETCH9_R)
    extrude(amount=-FILTER_SPACE_DEPTH, mode=Mode.SUBTRACT)


solid = part.part
